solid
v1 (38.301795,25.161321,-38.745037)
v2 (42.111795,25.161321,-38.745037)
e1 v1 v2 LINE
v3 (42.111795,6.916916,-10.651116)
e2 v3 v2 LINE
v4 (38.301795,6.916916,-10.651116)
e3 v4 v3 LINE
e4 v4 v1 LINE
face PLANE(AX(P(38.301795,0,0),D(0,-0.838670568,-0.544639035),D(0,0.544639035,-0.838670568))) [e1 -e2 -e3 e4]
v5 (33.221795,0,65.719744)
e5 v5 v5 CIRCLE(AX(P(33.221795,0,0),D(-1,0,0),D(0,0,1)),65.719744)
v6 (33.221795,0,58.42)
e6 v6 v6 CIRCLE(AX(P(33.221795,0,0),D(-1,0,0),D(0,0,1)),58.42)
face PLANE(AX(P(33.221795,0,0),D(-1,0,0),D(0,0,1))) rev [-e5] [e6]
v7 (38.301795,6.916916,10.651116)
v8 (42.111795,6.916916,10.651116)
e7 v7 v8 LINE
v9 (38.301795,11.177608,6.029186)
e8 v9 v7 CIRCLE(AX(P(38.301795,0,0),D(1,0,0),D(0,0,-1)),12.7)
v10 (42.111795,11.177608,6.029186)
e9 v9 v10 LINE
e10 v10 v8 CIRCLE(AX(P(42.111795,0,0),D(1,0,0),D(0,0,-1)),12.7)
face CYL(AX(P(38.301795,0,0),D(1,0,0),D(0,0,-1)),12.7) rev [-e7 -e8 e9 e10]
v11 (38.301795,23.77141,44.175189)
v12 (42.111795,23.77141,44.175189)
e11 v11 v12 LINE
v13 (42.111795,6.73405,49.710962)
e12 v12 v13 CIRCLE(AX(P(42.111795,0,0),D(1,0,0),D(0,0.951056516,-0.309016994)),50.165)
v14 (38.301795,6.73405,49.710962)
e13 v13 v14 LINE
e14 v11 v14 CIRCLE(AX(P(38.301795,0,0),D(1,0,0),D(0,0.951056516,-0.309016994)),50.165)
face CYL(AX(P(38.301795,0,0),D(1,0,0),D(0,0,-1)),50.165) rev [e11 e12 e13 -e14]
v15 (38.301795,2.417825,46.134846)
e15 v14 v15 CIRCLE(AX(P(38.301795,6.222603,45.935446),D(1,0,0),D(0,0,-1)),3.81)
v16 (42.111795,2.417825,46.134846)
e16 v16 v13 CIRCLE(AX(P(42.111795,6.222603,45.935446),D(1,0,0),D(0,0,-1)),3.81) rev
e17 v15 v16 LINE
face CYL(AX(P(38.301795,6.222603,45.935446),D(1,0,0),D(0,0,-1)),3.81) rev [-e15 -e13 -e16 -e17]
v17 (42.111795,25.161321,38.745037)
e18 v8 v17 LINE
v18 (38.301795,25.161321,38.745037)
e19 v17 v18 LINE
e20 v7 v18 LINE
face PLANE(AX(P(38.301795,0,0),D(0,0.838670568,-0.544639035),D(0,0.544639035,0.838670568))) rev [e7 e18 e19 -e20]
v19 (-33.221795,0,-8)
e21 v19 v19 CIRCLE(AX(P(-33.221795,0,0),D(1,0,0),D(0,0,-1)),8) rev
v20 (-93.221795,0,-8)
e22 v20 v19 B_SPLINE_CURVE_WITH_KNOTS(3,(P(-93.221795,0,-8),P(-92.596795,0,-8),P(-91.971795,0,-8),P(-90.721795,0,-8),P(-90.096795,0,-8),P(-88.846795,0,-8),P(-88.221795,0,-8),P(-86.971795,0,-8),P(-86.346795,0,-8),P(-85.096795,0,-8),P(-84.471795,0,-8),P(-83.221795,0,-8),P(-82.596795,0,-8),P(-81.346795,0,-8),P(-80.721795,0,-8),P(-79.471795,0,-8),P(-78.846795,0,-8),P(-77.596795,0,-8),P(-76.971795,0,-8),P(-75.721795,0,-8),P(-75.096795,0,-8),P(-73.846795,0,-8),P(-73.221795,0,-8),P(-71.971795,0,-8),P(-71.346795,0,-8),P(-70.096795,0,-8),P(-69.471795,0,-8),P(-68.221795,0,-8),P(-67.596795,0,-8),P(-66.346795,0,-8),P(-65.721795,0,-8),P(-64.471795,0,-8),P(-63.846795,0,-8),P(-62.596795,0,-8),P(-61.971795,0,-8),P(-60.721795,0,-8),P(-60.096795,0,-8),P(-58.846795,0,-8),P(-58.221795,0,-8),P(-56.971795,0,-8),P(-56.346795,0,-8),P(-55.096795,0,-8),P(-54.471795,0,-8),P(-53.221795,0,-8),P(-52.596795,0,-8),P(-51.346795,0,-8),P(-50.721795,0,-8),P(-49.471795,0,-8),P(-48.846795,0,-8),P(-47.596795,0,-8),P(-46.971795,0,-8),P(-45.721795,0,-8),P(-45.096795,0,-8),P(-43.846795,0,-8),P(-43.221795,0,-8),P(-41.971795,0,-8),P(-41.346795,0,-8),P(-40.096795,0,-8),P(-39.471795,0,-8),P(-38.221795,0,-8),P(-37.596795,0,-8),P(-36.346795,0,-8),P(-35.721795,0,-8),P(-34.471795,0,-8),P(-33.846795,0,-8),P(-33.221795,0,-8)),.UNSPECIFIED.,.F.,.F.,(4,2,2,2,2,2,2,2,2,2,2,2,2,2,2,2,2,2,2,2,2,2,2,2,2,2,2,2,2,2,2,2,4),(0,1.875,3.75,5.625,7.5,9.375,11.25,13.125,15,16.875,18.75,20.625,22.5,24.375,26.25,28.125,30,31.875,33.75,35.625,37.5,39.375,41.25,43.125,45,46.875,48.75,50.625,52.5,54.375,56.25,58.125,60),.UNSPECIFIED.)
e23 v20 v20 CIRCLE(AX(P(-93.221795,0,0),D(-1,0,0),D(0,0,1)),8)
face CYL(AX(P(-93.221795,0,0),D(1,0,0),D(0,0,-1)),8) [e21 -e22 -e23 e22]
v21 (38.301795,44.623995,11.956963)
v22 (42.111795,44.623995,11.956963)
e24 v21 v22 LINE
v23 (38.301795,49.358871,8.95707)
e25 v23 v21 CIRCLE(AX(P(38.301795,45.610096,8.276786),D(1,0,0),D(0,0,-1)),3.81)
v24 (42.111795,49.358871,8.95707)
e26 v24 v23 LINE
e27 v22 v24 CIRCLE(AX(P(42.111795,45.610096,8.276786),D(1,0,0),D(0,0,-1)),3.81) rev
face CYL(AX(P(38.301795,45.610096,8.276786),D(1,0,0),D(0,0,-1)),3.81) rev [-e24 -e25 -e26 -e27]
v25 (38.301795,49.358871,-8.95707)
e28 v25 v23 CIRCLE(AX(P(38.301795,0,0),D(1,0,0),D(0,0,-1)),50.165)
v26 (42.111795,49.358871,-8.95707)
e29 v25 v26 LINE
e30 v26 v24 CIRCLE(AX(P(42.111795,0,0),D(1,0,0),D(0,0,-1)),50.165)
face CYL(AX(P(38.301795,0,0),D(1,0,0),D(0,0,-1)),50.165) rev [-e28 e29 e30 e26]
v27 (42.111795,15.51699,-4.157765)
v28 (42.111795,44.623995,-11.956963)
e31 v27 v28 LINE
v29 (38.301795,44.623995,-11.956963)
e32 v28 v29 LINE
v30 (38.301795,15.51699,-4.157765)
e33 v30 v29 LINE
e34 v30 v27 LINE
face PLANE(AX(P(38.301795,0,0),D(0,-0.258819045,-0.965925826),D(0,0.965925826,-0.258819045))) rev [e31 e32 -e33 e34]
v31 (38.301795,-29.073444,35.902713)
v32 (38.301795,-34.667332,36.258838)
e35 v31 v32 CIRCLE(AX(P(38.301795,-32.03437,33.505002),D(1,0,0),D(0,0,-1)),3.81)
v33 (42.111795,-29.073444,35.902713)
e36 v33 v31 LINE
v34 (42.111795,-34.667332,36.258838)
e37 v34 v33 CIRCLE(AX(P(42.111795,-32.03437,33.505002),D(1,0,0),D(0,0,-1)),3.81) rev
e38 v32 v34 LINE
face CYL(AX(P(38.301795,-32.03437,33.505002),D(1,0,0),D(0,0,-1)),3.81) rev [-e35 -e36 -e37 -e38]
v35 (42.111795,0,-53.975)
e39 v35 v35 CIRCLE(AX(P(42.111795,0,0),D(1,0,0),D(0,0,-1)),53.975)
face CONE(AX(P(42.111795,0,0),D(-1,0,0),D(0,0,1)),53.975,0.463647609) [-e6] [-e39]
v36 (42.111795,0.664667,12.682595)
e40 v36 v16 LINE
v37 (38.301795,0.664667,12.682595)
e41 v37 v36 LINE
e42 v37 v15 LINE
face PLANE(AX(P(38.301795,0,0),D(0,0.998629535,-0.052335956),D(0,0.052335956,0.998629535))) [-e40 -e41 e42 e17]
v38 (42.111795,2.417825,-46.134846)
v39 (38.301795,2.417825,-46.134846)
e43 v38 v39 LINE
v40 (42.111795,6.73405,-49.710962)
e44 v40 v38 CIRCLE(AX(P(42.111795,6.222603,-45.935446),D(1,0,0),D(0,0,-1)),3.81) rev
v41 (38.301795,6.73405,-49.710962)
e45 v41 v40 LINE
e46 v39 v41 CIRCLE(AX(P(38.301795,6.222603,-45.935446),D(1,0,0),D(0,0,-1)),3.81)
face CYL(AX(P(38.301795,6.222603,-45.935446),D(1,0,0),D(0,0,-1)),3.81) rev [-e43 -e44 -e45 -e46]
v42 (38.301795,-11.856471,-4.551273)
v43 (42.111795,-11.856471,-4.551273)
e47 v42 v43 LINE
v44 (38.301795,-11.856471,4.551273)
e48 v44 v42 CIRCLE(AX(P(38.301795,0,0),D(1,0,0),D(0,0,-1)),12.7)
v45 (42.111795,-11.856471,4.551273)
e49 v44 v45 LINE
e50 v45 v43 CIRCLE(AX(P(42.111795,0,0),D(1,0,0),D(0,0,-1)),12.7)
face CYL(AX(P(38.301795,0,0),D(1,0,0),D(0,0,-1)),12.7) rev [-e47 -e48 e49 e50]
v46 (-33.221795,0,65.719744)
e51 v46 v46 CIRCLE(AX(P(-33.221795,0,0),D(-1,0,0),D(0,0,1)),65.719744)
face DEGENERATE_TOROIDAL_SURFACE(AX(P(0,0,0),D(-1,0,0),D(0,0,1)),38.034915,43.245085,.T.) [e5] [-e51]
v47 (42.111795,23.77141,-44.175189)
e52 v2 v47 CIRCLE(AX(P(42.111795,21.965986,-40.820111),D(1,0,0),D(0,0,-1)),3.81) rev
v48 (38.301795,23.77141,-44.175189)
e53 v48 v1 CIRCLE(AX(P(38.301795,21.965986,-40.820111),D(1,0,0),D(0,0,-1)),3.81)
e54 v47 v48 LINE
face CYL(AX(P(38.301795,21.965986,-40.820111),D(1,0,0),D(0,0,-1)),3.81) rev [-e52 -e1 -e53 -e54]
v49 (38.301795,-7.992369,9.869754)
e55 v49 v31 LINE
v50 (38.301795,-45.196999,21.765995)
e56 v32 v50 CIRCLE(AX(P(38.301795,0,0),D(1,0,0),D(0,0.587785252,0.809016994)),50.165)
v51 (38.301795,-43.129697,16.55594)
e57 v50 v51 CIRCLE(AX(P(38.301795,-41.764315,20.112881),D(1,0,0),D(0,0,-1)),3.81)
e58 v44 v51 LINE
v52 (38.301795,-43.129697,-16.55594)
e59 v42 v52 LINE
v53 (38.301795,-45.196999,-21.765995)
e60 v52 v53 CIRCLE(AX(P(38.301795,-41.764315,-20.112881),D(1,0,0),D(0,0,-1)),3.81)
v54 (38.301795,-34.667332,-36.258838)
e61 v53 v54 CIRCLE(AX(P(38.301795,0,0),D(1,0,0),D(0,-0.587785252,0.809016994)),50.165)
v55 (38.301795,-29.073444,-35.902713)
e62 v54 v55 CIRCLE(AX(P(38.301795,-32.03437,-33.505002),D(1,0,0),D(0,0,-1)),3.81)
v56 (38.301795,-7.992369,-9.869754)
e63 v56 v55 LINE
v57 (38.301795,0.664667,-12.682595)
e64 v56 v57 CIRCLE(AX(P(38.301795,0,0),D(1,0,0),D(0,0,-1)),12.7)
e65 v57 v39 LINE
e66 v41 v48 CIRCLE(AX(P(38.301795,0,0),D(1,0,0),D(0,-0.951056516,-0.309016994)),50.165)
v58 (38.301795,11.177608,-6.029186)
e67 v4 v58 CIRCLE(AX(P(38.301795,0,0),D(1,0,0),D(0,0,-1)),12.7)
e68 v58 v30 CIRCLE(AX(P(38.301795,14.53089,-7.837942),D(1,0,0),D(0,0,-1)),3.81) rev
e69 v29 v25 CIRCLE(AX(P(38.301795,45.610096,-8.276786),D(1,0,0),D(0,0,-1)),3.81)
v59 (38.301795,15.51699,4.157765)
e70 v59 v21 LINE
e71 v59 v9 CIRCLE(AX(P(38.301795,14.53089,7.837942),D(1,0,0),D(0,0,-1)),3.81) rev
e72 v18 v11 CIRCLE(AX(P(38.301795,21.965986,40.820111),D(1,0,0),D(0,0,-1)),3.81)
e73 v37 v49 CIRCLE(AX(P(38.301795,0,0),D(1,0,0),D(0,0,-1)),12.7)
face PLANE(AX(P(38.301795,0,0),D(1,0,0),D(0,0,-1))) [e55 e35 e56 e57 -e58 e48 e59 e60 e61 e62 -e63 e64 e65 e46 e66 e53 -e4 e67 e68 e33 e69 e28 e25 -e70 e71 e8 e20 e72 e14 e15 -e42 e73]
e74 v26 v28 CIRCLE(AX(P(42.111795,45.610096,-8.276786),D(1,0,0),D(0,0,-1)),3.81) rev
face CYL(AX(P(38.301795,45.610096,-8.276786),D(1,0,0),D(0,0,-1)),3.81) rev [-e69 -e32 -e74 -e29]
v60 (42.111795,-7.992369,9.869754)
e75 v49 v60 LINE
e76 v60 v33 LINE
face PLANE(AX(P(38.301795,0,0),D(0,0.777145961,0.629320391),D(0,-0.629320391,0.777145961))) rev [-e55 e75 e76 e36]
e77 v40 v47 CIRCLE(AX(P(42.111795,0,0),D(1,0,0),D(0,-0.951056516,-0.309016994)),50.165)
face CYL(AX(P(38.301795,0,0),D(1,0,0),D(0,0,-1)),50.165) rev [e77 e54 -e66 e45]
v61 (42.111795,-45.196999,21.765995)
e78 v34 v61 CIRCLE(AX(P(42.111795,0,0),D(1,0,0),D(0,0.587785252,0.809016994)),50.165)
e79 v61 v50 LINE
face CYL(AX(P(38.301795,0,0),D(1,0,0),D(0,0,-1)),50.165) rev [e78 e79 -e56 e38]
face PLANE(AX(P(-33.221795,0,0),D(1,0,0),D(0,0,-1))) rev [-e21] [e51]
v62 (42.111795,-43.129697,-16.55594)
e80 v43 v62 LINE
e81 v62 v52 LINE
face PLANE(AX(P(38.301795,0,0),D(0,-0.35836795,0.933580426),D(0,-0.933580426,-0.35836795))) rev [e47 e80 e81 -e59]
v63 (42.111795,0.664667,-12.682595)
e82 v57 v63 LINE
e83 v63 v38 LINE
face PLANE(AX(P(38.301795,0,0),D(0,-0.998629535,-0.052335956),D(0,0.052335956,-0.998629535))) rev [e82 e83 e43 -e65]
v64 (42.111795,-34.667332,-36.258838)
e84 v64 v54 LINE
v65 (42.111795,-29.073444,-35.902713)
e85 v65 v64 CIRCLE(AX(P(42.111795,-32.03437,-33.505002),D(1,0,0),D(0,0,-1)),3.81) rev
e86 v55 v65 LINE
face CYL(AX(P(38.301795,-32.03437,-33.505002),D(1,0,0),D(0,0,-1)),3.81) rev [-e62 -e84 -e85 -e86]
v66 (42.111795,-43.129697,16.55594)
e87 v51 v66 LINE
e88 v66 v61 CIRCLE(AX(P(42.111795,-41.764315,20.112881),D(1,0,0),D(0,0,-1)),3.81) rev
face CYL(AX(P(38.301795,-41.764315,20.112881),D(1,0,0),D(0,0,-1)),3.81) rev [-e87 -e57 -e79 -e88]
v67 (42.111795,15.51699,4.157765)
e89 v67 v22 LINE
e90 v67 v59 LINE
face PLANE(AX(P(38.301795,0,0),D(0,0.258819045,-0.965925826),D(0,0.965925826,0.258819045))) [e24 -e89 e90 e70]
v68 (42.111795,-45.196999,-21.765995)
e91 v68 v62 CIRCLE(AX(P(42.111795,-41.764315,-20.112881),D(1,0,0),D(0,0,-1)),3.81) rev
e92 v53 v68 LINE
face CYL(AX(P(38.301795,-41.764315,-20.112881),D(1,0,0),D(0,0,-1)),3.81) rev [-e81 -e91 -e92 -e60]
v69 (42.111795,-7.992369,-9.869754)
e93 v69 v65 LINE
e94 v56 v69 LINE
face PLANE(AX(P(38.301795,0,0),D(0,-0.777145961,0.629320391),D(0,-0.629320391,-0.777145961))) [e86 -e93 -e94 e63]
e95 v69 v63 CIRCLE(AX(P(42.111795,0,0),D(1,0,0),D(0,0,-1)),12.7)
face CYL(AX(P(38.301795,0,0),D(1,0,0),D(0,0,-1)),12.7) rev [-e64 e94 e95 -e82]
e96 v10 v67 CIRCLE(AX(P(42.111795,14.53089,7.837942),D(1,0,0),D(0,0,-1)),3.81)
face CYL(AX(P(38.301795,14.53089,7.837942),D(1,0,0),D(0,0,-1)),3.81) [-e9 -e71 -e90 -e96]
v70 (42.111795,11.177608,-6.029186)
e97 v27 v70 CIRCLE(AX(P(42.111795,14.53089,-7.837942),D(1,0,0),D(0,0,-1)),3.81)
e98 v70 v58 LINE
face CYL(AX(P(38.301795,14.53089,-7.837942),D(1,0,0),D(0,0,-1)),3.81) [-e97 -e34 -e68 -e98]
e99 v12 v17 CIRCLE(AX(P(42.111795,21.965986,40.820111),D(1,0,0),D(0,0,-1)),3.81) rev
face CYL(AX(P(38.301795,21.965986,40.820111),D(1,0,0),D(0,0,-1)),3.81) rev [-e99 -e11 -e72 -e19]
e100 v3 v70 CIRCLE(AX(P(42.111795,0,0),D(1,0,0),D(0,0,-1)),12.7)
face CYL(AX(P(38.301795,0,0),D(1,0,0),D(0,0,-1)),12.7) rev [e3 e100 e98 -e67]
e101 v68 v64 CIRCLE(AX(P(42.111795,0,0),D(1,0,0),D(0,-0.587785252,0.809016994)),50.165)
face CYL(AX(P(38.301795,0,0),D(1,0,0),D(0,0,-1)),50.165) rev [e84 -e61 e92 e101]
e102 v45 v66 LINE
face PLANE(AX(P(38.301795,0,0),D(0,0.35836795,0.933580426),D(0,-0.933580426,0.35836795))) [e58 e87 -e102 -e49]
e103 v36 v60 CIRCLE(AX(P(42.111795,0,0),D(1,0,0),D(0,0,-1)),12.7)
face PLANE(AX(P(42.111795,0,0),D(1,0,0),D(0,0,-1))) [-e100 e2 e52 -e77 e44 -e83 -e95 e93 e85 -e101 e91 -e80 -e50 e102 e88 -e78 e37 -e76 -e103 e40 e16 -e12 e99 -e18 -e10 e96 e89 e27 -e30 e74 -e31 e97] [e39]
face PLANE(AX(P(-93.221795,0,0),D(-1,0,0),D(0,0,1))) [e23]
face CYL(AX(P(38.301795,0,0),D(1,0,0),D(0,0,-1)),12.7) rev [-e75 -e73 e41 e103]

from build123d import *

# Parameters (mm, degrees)
SKETCH3_R           = 60.325
BOSS_EXTRUDE1_DEPTH = 8.89
CHAMFER1_SIZE       = 12.7
CHAMFER1_SIZE_2     = 6.35
CUT_EXTRUDE1_DEPTH  = 3.81
FILLET1_R           = 3.81
CIRPATTERN1_START   = 38.301794875
CIRPATTERN1_DEPTH   = 3.81
SKETCH5_R           = 8
BOSS_EXTRUDE2_DEPTH = 60


# Read off the part's stored shape, not the designer's step: CirPattern1
with BuildPart() as part:
    # Sketch1 → Revolve1 (revolve)
    with BuildSketch(Plane.XZ, mode=Mode.PRIVATE) as revolve1_sk:
        with BuildLine():
            ThreePointArc((-33.221794875, -65.71974362), (0, -81.28), (33.221794875, -65.71974362))
            Line((33.221794875, -65.71974362), (33.221794875, 0))
            Line((33.221794875, 0), (-33.221794875, 0))
            Line((-33.221794875, 0), (-33.221794875, -65.71974362))
        make_face()
    revolve(revolve1_sk.sketch.rotate(Axis((-33.221794875, 0, 0), (1, 0, 0)), 180), axis=Axis((-33.221794875, 0, 0), (1, 0, 0)))

    # Sketch3 → Boss-Extrude1 (add)
    with BuildSketch(Plane(origin=(33.221794875, 0, 0), x_dir=(0, 0, -1), z_dir=(1, 0, 0))):
        with Locations(Location((0, 0, 0), (0, 0, 180))):
            Circle(SKETCH3_R)
    extrude(amount=BOSS_EXTRUDE1_DEPTH)

    # Chamfer1
    # the kernel refuses this chamfer: 12.7, 6.35 mm, written as the material it takes off along each edge
    with BuildSketch(Plane(origin=(42.111794875, 0, 0), x_dir=(0, 0, 1), z_dir=(0, 1, 0))) as chamfer1_piece_1_section:
        Polygon((60.325, -CHAMFER1_SIZE), (60.325 - CHAMFER1_SIZE_2, 0), (60.325, 0), align=None)
    chamfer1_piece_1 = revolve(axis=Axis((42.111794875, 0, 0), (1, 0, 0)), mode=Mode.PRIVATE)
    chamfer1_piece_1 = split(chamfer1_piece_1, bisect_by=Plane(origin=(33.221794875, 0, -56.304392735), z_dir=(1, 0, 0)), keep=Keep.TOP, mode=Mode.PRIVATE)
    add(chamfer1_piece_1, mode=Mode.SUBTRACT)

    # Sketch4 → Cut-Extrude1 (cut)
    with BuildSketch(Plane(origin=(42.111794875, 0, 0), x_dir=(0, 0, -1), z_dir=(1, 0, 0))):
        with BuildLine():
            ThreePointArc((-3.287001873, 12.267257994), (0, -12.7), (3.287001873, 12.267257994))
            Line((3.287001873, 12.267257994), (12.983657398, 48.455669076))
            ThreePointArc((12.983657398, 48.455669076), (0, 50.165), (-12.983657398, 48.455669076))
            Line((-12.983657398, 48.455669076), (-3.287001873, 12.267257994))
        make_face()
    extrude(amount=-CUT_EXTRUDE1_DEPTH, mode=Mode.SUBTRACT)

    # Fillet1
    fillet1_edges = [part.edges().sort_by_distance(p)[0] for p in [
        (40.206794875, 48.455669076, -12.983657398),
        (40.206794875, 12.267257994, 3.287001873),
        (40.206794875, 48.455669076, 12.983657398),
        (40.206794875, 12.267257994, -3.287001873),
    ]]
    fillet(fillet1_edges, radius=FILLET1_R)

    # CirPattern1 outline → CirPattern1 (cut)
    with BuildSketch(Plane.YZ.offset(CIRPATTERN1_START)):
        with BuildLine():
            ThreePointArc((-29.073443692, 35.902712946), (-31.792302862, 37.307304663), (-34.667331707, 36.258838058))
            ThreePointArc((-34.667331707, 36.258838058), (-40.584337523, 29.486247181), (-45.196998855, 21.765994566))
            ThreePointArc((-45.196998855, 21.765994566), (-45.30571708, 18.70768565), (-43.129697286, 16.55593963))
            Line((-43.129697286, 16.55593963), (-11.856471417, 4.551272959))
            ThreePointArc((-11.856471417, 4.551272959), (-10.274515829, 7.464872704), (-7.992368966, 9.869753711))
            Line((-7.992368966, 9.869753711), (-29.073443692, 35.902712946))
        make_face()
        with BuildLine():
            Line((2.417824845, 46.134846353), (0.664666644, 12.682595091))
            ThreePointArc((0.664666644, 12.682595091), (3.924515829, 12.078417757), (6.916915745, 10.651116213))
            Line((6.916915745, 10.651116213), (25.161320914, 38.745036519))
            ThreePointArc((25.161320914, 38.745036519), (25.656993331, 41.764867961), (23.771409561, 44.175188879))
            ThreePointArc((23.771409561, 44.175188879), (15.501837523, 47.70975014), (6.734050225, 49.710962499))
            ThreePointArc((6.734050225, 49.710962499), (3.791829822, 48.869290246), (2.417824845, 46.134846353))
        make_face()
        with BuildLine():
            ThreePointArc((6.916915745, -10.651116213), (3.924515829, -12.078417757), (0.664666644, -12.682595091))
            Line((0.664666644, -12.682595091), (2.417824845, -46.134846353))
            ThreePointArc((2.417824845, -46.134846353), (3.791829822, -48.869290246), (6.734050225, -49.710962499))
            ThreePointArc((6.734050225, -49.710962499), (15.501837523, -47.70975014), (23.771409561, -44.175188879))
            ThreePointArc((23.771409561, -44.175188879), (25.656993331, -41.764867961), (25.161320914, -38.745036519))
            Line((25.161320914, -38.745036519), (6.916915745, -10.651116213))
        make_face()
        with BuildLine():
            ThreePointArc((-7.992368966, -9.869753711), (-10.274515829, -7.464872704), (-11.856471417, -4.551272959))
            Line((-11.856471417, -4.551272959), (-43.129697286, -16.55593963))
            ThreePointArc((-43.129697286, -16.55593963), (-45.30571708, -18.70768565), (-45.196998855, -21.765994566))
            ThreePointArc((-45.196998855, -21.765994566), (-40.584337523, -29.486247181), (-34.667331707, -36.258838058))
            ThreePointArc((-34.667331707, -36.258838058), (-31.792302862, -37.307304663), (-29.073443692, -35.902712946))
            Line((-29.073443692, -35.902712946), (-7.992368966, -9.869753711))
        make_face()
    extrude(amount=CIRPATTERN1_DEPTH, mode=Mode.SUBTRACT)

    # Sketch5 → Boss-Extrude2 (add)
    with BuildSketch(Plane.ZY.offset(33.221794875)):
        with Locations(Location((0, 0, 0), (0, 0, 180))):
            Circle(SKETCH5_R)
    extrude(amount=BOSS_EXTRUDE2_DEPTH)


solid = part.part
